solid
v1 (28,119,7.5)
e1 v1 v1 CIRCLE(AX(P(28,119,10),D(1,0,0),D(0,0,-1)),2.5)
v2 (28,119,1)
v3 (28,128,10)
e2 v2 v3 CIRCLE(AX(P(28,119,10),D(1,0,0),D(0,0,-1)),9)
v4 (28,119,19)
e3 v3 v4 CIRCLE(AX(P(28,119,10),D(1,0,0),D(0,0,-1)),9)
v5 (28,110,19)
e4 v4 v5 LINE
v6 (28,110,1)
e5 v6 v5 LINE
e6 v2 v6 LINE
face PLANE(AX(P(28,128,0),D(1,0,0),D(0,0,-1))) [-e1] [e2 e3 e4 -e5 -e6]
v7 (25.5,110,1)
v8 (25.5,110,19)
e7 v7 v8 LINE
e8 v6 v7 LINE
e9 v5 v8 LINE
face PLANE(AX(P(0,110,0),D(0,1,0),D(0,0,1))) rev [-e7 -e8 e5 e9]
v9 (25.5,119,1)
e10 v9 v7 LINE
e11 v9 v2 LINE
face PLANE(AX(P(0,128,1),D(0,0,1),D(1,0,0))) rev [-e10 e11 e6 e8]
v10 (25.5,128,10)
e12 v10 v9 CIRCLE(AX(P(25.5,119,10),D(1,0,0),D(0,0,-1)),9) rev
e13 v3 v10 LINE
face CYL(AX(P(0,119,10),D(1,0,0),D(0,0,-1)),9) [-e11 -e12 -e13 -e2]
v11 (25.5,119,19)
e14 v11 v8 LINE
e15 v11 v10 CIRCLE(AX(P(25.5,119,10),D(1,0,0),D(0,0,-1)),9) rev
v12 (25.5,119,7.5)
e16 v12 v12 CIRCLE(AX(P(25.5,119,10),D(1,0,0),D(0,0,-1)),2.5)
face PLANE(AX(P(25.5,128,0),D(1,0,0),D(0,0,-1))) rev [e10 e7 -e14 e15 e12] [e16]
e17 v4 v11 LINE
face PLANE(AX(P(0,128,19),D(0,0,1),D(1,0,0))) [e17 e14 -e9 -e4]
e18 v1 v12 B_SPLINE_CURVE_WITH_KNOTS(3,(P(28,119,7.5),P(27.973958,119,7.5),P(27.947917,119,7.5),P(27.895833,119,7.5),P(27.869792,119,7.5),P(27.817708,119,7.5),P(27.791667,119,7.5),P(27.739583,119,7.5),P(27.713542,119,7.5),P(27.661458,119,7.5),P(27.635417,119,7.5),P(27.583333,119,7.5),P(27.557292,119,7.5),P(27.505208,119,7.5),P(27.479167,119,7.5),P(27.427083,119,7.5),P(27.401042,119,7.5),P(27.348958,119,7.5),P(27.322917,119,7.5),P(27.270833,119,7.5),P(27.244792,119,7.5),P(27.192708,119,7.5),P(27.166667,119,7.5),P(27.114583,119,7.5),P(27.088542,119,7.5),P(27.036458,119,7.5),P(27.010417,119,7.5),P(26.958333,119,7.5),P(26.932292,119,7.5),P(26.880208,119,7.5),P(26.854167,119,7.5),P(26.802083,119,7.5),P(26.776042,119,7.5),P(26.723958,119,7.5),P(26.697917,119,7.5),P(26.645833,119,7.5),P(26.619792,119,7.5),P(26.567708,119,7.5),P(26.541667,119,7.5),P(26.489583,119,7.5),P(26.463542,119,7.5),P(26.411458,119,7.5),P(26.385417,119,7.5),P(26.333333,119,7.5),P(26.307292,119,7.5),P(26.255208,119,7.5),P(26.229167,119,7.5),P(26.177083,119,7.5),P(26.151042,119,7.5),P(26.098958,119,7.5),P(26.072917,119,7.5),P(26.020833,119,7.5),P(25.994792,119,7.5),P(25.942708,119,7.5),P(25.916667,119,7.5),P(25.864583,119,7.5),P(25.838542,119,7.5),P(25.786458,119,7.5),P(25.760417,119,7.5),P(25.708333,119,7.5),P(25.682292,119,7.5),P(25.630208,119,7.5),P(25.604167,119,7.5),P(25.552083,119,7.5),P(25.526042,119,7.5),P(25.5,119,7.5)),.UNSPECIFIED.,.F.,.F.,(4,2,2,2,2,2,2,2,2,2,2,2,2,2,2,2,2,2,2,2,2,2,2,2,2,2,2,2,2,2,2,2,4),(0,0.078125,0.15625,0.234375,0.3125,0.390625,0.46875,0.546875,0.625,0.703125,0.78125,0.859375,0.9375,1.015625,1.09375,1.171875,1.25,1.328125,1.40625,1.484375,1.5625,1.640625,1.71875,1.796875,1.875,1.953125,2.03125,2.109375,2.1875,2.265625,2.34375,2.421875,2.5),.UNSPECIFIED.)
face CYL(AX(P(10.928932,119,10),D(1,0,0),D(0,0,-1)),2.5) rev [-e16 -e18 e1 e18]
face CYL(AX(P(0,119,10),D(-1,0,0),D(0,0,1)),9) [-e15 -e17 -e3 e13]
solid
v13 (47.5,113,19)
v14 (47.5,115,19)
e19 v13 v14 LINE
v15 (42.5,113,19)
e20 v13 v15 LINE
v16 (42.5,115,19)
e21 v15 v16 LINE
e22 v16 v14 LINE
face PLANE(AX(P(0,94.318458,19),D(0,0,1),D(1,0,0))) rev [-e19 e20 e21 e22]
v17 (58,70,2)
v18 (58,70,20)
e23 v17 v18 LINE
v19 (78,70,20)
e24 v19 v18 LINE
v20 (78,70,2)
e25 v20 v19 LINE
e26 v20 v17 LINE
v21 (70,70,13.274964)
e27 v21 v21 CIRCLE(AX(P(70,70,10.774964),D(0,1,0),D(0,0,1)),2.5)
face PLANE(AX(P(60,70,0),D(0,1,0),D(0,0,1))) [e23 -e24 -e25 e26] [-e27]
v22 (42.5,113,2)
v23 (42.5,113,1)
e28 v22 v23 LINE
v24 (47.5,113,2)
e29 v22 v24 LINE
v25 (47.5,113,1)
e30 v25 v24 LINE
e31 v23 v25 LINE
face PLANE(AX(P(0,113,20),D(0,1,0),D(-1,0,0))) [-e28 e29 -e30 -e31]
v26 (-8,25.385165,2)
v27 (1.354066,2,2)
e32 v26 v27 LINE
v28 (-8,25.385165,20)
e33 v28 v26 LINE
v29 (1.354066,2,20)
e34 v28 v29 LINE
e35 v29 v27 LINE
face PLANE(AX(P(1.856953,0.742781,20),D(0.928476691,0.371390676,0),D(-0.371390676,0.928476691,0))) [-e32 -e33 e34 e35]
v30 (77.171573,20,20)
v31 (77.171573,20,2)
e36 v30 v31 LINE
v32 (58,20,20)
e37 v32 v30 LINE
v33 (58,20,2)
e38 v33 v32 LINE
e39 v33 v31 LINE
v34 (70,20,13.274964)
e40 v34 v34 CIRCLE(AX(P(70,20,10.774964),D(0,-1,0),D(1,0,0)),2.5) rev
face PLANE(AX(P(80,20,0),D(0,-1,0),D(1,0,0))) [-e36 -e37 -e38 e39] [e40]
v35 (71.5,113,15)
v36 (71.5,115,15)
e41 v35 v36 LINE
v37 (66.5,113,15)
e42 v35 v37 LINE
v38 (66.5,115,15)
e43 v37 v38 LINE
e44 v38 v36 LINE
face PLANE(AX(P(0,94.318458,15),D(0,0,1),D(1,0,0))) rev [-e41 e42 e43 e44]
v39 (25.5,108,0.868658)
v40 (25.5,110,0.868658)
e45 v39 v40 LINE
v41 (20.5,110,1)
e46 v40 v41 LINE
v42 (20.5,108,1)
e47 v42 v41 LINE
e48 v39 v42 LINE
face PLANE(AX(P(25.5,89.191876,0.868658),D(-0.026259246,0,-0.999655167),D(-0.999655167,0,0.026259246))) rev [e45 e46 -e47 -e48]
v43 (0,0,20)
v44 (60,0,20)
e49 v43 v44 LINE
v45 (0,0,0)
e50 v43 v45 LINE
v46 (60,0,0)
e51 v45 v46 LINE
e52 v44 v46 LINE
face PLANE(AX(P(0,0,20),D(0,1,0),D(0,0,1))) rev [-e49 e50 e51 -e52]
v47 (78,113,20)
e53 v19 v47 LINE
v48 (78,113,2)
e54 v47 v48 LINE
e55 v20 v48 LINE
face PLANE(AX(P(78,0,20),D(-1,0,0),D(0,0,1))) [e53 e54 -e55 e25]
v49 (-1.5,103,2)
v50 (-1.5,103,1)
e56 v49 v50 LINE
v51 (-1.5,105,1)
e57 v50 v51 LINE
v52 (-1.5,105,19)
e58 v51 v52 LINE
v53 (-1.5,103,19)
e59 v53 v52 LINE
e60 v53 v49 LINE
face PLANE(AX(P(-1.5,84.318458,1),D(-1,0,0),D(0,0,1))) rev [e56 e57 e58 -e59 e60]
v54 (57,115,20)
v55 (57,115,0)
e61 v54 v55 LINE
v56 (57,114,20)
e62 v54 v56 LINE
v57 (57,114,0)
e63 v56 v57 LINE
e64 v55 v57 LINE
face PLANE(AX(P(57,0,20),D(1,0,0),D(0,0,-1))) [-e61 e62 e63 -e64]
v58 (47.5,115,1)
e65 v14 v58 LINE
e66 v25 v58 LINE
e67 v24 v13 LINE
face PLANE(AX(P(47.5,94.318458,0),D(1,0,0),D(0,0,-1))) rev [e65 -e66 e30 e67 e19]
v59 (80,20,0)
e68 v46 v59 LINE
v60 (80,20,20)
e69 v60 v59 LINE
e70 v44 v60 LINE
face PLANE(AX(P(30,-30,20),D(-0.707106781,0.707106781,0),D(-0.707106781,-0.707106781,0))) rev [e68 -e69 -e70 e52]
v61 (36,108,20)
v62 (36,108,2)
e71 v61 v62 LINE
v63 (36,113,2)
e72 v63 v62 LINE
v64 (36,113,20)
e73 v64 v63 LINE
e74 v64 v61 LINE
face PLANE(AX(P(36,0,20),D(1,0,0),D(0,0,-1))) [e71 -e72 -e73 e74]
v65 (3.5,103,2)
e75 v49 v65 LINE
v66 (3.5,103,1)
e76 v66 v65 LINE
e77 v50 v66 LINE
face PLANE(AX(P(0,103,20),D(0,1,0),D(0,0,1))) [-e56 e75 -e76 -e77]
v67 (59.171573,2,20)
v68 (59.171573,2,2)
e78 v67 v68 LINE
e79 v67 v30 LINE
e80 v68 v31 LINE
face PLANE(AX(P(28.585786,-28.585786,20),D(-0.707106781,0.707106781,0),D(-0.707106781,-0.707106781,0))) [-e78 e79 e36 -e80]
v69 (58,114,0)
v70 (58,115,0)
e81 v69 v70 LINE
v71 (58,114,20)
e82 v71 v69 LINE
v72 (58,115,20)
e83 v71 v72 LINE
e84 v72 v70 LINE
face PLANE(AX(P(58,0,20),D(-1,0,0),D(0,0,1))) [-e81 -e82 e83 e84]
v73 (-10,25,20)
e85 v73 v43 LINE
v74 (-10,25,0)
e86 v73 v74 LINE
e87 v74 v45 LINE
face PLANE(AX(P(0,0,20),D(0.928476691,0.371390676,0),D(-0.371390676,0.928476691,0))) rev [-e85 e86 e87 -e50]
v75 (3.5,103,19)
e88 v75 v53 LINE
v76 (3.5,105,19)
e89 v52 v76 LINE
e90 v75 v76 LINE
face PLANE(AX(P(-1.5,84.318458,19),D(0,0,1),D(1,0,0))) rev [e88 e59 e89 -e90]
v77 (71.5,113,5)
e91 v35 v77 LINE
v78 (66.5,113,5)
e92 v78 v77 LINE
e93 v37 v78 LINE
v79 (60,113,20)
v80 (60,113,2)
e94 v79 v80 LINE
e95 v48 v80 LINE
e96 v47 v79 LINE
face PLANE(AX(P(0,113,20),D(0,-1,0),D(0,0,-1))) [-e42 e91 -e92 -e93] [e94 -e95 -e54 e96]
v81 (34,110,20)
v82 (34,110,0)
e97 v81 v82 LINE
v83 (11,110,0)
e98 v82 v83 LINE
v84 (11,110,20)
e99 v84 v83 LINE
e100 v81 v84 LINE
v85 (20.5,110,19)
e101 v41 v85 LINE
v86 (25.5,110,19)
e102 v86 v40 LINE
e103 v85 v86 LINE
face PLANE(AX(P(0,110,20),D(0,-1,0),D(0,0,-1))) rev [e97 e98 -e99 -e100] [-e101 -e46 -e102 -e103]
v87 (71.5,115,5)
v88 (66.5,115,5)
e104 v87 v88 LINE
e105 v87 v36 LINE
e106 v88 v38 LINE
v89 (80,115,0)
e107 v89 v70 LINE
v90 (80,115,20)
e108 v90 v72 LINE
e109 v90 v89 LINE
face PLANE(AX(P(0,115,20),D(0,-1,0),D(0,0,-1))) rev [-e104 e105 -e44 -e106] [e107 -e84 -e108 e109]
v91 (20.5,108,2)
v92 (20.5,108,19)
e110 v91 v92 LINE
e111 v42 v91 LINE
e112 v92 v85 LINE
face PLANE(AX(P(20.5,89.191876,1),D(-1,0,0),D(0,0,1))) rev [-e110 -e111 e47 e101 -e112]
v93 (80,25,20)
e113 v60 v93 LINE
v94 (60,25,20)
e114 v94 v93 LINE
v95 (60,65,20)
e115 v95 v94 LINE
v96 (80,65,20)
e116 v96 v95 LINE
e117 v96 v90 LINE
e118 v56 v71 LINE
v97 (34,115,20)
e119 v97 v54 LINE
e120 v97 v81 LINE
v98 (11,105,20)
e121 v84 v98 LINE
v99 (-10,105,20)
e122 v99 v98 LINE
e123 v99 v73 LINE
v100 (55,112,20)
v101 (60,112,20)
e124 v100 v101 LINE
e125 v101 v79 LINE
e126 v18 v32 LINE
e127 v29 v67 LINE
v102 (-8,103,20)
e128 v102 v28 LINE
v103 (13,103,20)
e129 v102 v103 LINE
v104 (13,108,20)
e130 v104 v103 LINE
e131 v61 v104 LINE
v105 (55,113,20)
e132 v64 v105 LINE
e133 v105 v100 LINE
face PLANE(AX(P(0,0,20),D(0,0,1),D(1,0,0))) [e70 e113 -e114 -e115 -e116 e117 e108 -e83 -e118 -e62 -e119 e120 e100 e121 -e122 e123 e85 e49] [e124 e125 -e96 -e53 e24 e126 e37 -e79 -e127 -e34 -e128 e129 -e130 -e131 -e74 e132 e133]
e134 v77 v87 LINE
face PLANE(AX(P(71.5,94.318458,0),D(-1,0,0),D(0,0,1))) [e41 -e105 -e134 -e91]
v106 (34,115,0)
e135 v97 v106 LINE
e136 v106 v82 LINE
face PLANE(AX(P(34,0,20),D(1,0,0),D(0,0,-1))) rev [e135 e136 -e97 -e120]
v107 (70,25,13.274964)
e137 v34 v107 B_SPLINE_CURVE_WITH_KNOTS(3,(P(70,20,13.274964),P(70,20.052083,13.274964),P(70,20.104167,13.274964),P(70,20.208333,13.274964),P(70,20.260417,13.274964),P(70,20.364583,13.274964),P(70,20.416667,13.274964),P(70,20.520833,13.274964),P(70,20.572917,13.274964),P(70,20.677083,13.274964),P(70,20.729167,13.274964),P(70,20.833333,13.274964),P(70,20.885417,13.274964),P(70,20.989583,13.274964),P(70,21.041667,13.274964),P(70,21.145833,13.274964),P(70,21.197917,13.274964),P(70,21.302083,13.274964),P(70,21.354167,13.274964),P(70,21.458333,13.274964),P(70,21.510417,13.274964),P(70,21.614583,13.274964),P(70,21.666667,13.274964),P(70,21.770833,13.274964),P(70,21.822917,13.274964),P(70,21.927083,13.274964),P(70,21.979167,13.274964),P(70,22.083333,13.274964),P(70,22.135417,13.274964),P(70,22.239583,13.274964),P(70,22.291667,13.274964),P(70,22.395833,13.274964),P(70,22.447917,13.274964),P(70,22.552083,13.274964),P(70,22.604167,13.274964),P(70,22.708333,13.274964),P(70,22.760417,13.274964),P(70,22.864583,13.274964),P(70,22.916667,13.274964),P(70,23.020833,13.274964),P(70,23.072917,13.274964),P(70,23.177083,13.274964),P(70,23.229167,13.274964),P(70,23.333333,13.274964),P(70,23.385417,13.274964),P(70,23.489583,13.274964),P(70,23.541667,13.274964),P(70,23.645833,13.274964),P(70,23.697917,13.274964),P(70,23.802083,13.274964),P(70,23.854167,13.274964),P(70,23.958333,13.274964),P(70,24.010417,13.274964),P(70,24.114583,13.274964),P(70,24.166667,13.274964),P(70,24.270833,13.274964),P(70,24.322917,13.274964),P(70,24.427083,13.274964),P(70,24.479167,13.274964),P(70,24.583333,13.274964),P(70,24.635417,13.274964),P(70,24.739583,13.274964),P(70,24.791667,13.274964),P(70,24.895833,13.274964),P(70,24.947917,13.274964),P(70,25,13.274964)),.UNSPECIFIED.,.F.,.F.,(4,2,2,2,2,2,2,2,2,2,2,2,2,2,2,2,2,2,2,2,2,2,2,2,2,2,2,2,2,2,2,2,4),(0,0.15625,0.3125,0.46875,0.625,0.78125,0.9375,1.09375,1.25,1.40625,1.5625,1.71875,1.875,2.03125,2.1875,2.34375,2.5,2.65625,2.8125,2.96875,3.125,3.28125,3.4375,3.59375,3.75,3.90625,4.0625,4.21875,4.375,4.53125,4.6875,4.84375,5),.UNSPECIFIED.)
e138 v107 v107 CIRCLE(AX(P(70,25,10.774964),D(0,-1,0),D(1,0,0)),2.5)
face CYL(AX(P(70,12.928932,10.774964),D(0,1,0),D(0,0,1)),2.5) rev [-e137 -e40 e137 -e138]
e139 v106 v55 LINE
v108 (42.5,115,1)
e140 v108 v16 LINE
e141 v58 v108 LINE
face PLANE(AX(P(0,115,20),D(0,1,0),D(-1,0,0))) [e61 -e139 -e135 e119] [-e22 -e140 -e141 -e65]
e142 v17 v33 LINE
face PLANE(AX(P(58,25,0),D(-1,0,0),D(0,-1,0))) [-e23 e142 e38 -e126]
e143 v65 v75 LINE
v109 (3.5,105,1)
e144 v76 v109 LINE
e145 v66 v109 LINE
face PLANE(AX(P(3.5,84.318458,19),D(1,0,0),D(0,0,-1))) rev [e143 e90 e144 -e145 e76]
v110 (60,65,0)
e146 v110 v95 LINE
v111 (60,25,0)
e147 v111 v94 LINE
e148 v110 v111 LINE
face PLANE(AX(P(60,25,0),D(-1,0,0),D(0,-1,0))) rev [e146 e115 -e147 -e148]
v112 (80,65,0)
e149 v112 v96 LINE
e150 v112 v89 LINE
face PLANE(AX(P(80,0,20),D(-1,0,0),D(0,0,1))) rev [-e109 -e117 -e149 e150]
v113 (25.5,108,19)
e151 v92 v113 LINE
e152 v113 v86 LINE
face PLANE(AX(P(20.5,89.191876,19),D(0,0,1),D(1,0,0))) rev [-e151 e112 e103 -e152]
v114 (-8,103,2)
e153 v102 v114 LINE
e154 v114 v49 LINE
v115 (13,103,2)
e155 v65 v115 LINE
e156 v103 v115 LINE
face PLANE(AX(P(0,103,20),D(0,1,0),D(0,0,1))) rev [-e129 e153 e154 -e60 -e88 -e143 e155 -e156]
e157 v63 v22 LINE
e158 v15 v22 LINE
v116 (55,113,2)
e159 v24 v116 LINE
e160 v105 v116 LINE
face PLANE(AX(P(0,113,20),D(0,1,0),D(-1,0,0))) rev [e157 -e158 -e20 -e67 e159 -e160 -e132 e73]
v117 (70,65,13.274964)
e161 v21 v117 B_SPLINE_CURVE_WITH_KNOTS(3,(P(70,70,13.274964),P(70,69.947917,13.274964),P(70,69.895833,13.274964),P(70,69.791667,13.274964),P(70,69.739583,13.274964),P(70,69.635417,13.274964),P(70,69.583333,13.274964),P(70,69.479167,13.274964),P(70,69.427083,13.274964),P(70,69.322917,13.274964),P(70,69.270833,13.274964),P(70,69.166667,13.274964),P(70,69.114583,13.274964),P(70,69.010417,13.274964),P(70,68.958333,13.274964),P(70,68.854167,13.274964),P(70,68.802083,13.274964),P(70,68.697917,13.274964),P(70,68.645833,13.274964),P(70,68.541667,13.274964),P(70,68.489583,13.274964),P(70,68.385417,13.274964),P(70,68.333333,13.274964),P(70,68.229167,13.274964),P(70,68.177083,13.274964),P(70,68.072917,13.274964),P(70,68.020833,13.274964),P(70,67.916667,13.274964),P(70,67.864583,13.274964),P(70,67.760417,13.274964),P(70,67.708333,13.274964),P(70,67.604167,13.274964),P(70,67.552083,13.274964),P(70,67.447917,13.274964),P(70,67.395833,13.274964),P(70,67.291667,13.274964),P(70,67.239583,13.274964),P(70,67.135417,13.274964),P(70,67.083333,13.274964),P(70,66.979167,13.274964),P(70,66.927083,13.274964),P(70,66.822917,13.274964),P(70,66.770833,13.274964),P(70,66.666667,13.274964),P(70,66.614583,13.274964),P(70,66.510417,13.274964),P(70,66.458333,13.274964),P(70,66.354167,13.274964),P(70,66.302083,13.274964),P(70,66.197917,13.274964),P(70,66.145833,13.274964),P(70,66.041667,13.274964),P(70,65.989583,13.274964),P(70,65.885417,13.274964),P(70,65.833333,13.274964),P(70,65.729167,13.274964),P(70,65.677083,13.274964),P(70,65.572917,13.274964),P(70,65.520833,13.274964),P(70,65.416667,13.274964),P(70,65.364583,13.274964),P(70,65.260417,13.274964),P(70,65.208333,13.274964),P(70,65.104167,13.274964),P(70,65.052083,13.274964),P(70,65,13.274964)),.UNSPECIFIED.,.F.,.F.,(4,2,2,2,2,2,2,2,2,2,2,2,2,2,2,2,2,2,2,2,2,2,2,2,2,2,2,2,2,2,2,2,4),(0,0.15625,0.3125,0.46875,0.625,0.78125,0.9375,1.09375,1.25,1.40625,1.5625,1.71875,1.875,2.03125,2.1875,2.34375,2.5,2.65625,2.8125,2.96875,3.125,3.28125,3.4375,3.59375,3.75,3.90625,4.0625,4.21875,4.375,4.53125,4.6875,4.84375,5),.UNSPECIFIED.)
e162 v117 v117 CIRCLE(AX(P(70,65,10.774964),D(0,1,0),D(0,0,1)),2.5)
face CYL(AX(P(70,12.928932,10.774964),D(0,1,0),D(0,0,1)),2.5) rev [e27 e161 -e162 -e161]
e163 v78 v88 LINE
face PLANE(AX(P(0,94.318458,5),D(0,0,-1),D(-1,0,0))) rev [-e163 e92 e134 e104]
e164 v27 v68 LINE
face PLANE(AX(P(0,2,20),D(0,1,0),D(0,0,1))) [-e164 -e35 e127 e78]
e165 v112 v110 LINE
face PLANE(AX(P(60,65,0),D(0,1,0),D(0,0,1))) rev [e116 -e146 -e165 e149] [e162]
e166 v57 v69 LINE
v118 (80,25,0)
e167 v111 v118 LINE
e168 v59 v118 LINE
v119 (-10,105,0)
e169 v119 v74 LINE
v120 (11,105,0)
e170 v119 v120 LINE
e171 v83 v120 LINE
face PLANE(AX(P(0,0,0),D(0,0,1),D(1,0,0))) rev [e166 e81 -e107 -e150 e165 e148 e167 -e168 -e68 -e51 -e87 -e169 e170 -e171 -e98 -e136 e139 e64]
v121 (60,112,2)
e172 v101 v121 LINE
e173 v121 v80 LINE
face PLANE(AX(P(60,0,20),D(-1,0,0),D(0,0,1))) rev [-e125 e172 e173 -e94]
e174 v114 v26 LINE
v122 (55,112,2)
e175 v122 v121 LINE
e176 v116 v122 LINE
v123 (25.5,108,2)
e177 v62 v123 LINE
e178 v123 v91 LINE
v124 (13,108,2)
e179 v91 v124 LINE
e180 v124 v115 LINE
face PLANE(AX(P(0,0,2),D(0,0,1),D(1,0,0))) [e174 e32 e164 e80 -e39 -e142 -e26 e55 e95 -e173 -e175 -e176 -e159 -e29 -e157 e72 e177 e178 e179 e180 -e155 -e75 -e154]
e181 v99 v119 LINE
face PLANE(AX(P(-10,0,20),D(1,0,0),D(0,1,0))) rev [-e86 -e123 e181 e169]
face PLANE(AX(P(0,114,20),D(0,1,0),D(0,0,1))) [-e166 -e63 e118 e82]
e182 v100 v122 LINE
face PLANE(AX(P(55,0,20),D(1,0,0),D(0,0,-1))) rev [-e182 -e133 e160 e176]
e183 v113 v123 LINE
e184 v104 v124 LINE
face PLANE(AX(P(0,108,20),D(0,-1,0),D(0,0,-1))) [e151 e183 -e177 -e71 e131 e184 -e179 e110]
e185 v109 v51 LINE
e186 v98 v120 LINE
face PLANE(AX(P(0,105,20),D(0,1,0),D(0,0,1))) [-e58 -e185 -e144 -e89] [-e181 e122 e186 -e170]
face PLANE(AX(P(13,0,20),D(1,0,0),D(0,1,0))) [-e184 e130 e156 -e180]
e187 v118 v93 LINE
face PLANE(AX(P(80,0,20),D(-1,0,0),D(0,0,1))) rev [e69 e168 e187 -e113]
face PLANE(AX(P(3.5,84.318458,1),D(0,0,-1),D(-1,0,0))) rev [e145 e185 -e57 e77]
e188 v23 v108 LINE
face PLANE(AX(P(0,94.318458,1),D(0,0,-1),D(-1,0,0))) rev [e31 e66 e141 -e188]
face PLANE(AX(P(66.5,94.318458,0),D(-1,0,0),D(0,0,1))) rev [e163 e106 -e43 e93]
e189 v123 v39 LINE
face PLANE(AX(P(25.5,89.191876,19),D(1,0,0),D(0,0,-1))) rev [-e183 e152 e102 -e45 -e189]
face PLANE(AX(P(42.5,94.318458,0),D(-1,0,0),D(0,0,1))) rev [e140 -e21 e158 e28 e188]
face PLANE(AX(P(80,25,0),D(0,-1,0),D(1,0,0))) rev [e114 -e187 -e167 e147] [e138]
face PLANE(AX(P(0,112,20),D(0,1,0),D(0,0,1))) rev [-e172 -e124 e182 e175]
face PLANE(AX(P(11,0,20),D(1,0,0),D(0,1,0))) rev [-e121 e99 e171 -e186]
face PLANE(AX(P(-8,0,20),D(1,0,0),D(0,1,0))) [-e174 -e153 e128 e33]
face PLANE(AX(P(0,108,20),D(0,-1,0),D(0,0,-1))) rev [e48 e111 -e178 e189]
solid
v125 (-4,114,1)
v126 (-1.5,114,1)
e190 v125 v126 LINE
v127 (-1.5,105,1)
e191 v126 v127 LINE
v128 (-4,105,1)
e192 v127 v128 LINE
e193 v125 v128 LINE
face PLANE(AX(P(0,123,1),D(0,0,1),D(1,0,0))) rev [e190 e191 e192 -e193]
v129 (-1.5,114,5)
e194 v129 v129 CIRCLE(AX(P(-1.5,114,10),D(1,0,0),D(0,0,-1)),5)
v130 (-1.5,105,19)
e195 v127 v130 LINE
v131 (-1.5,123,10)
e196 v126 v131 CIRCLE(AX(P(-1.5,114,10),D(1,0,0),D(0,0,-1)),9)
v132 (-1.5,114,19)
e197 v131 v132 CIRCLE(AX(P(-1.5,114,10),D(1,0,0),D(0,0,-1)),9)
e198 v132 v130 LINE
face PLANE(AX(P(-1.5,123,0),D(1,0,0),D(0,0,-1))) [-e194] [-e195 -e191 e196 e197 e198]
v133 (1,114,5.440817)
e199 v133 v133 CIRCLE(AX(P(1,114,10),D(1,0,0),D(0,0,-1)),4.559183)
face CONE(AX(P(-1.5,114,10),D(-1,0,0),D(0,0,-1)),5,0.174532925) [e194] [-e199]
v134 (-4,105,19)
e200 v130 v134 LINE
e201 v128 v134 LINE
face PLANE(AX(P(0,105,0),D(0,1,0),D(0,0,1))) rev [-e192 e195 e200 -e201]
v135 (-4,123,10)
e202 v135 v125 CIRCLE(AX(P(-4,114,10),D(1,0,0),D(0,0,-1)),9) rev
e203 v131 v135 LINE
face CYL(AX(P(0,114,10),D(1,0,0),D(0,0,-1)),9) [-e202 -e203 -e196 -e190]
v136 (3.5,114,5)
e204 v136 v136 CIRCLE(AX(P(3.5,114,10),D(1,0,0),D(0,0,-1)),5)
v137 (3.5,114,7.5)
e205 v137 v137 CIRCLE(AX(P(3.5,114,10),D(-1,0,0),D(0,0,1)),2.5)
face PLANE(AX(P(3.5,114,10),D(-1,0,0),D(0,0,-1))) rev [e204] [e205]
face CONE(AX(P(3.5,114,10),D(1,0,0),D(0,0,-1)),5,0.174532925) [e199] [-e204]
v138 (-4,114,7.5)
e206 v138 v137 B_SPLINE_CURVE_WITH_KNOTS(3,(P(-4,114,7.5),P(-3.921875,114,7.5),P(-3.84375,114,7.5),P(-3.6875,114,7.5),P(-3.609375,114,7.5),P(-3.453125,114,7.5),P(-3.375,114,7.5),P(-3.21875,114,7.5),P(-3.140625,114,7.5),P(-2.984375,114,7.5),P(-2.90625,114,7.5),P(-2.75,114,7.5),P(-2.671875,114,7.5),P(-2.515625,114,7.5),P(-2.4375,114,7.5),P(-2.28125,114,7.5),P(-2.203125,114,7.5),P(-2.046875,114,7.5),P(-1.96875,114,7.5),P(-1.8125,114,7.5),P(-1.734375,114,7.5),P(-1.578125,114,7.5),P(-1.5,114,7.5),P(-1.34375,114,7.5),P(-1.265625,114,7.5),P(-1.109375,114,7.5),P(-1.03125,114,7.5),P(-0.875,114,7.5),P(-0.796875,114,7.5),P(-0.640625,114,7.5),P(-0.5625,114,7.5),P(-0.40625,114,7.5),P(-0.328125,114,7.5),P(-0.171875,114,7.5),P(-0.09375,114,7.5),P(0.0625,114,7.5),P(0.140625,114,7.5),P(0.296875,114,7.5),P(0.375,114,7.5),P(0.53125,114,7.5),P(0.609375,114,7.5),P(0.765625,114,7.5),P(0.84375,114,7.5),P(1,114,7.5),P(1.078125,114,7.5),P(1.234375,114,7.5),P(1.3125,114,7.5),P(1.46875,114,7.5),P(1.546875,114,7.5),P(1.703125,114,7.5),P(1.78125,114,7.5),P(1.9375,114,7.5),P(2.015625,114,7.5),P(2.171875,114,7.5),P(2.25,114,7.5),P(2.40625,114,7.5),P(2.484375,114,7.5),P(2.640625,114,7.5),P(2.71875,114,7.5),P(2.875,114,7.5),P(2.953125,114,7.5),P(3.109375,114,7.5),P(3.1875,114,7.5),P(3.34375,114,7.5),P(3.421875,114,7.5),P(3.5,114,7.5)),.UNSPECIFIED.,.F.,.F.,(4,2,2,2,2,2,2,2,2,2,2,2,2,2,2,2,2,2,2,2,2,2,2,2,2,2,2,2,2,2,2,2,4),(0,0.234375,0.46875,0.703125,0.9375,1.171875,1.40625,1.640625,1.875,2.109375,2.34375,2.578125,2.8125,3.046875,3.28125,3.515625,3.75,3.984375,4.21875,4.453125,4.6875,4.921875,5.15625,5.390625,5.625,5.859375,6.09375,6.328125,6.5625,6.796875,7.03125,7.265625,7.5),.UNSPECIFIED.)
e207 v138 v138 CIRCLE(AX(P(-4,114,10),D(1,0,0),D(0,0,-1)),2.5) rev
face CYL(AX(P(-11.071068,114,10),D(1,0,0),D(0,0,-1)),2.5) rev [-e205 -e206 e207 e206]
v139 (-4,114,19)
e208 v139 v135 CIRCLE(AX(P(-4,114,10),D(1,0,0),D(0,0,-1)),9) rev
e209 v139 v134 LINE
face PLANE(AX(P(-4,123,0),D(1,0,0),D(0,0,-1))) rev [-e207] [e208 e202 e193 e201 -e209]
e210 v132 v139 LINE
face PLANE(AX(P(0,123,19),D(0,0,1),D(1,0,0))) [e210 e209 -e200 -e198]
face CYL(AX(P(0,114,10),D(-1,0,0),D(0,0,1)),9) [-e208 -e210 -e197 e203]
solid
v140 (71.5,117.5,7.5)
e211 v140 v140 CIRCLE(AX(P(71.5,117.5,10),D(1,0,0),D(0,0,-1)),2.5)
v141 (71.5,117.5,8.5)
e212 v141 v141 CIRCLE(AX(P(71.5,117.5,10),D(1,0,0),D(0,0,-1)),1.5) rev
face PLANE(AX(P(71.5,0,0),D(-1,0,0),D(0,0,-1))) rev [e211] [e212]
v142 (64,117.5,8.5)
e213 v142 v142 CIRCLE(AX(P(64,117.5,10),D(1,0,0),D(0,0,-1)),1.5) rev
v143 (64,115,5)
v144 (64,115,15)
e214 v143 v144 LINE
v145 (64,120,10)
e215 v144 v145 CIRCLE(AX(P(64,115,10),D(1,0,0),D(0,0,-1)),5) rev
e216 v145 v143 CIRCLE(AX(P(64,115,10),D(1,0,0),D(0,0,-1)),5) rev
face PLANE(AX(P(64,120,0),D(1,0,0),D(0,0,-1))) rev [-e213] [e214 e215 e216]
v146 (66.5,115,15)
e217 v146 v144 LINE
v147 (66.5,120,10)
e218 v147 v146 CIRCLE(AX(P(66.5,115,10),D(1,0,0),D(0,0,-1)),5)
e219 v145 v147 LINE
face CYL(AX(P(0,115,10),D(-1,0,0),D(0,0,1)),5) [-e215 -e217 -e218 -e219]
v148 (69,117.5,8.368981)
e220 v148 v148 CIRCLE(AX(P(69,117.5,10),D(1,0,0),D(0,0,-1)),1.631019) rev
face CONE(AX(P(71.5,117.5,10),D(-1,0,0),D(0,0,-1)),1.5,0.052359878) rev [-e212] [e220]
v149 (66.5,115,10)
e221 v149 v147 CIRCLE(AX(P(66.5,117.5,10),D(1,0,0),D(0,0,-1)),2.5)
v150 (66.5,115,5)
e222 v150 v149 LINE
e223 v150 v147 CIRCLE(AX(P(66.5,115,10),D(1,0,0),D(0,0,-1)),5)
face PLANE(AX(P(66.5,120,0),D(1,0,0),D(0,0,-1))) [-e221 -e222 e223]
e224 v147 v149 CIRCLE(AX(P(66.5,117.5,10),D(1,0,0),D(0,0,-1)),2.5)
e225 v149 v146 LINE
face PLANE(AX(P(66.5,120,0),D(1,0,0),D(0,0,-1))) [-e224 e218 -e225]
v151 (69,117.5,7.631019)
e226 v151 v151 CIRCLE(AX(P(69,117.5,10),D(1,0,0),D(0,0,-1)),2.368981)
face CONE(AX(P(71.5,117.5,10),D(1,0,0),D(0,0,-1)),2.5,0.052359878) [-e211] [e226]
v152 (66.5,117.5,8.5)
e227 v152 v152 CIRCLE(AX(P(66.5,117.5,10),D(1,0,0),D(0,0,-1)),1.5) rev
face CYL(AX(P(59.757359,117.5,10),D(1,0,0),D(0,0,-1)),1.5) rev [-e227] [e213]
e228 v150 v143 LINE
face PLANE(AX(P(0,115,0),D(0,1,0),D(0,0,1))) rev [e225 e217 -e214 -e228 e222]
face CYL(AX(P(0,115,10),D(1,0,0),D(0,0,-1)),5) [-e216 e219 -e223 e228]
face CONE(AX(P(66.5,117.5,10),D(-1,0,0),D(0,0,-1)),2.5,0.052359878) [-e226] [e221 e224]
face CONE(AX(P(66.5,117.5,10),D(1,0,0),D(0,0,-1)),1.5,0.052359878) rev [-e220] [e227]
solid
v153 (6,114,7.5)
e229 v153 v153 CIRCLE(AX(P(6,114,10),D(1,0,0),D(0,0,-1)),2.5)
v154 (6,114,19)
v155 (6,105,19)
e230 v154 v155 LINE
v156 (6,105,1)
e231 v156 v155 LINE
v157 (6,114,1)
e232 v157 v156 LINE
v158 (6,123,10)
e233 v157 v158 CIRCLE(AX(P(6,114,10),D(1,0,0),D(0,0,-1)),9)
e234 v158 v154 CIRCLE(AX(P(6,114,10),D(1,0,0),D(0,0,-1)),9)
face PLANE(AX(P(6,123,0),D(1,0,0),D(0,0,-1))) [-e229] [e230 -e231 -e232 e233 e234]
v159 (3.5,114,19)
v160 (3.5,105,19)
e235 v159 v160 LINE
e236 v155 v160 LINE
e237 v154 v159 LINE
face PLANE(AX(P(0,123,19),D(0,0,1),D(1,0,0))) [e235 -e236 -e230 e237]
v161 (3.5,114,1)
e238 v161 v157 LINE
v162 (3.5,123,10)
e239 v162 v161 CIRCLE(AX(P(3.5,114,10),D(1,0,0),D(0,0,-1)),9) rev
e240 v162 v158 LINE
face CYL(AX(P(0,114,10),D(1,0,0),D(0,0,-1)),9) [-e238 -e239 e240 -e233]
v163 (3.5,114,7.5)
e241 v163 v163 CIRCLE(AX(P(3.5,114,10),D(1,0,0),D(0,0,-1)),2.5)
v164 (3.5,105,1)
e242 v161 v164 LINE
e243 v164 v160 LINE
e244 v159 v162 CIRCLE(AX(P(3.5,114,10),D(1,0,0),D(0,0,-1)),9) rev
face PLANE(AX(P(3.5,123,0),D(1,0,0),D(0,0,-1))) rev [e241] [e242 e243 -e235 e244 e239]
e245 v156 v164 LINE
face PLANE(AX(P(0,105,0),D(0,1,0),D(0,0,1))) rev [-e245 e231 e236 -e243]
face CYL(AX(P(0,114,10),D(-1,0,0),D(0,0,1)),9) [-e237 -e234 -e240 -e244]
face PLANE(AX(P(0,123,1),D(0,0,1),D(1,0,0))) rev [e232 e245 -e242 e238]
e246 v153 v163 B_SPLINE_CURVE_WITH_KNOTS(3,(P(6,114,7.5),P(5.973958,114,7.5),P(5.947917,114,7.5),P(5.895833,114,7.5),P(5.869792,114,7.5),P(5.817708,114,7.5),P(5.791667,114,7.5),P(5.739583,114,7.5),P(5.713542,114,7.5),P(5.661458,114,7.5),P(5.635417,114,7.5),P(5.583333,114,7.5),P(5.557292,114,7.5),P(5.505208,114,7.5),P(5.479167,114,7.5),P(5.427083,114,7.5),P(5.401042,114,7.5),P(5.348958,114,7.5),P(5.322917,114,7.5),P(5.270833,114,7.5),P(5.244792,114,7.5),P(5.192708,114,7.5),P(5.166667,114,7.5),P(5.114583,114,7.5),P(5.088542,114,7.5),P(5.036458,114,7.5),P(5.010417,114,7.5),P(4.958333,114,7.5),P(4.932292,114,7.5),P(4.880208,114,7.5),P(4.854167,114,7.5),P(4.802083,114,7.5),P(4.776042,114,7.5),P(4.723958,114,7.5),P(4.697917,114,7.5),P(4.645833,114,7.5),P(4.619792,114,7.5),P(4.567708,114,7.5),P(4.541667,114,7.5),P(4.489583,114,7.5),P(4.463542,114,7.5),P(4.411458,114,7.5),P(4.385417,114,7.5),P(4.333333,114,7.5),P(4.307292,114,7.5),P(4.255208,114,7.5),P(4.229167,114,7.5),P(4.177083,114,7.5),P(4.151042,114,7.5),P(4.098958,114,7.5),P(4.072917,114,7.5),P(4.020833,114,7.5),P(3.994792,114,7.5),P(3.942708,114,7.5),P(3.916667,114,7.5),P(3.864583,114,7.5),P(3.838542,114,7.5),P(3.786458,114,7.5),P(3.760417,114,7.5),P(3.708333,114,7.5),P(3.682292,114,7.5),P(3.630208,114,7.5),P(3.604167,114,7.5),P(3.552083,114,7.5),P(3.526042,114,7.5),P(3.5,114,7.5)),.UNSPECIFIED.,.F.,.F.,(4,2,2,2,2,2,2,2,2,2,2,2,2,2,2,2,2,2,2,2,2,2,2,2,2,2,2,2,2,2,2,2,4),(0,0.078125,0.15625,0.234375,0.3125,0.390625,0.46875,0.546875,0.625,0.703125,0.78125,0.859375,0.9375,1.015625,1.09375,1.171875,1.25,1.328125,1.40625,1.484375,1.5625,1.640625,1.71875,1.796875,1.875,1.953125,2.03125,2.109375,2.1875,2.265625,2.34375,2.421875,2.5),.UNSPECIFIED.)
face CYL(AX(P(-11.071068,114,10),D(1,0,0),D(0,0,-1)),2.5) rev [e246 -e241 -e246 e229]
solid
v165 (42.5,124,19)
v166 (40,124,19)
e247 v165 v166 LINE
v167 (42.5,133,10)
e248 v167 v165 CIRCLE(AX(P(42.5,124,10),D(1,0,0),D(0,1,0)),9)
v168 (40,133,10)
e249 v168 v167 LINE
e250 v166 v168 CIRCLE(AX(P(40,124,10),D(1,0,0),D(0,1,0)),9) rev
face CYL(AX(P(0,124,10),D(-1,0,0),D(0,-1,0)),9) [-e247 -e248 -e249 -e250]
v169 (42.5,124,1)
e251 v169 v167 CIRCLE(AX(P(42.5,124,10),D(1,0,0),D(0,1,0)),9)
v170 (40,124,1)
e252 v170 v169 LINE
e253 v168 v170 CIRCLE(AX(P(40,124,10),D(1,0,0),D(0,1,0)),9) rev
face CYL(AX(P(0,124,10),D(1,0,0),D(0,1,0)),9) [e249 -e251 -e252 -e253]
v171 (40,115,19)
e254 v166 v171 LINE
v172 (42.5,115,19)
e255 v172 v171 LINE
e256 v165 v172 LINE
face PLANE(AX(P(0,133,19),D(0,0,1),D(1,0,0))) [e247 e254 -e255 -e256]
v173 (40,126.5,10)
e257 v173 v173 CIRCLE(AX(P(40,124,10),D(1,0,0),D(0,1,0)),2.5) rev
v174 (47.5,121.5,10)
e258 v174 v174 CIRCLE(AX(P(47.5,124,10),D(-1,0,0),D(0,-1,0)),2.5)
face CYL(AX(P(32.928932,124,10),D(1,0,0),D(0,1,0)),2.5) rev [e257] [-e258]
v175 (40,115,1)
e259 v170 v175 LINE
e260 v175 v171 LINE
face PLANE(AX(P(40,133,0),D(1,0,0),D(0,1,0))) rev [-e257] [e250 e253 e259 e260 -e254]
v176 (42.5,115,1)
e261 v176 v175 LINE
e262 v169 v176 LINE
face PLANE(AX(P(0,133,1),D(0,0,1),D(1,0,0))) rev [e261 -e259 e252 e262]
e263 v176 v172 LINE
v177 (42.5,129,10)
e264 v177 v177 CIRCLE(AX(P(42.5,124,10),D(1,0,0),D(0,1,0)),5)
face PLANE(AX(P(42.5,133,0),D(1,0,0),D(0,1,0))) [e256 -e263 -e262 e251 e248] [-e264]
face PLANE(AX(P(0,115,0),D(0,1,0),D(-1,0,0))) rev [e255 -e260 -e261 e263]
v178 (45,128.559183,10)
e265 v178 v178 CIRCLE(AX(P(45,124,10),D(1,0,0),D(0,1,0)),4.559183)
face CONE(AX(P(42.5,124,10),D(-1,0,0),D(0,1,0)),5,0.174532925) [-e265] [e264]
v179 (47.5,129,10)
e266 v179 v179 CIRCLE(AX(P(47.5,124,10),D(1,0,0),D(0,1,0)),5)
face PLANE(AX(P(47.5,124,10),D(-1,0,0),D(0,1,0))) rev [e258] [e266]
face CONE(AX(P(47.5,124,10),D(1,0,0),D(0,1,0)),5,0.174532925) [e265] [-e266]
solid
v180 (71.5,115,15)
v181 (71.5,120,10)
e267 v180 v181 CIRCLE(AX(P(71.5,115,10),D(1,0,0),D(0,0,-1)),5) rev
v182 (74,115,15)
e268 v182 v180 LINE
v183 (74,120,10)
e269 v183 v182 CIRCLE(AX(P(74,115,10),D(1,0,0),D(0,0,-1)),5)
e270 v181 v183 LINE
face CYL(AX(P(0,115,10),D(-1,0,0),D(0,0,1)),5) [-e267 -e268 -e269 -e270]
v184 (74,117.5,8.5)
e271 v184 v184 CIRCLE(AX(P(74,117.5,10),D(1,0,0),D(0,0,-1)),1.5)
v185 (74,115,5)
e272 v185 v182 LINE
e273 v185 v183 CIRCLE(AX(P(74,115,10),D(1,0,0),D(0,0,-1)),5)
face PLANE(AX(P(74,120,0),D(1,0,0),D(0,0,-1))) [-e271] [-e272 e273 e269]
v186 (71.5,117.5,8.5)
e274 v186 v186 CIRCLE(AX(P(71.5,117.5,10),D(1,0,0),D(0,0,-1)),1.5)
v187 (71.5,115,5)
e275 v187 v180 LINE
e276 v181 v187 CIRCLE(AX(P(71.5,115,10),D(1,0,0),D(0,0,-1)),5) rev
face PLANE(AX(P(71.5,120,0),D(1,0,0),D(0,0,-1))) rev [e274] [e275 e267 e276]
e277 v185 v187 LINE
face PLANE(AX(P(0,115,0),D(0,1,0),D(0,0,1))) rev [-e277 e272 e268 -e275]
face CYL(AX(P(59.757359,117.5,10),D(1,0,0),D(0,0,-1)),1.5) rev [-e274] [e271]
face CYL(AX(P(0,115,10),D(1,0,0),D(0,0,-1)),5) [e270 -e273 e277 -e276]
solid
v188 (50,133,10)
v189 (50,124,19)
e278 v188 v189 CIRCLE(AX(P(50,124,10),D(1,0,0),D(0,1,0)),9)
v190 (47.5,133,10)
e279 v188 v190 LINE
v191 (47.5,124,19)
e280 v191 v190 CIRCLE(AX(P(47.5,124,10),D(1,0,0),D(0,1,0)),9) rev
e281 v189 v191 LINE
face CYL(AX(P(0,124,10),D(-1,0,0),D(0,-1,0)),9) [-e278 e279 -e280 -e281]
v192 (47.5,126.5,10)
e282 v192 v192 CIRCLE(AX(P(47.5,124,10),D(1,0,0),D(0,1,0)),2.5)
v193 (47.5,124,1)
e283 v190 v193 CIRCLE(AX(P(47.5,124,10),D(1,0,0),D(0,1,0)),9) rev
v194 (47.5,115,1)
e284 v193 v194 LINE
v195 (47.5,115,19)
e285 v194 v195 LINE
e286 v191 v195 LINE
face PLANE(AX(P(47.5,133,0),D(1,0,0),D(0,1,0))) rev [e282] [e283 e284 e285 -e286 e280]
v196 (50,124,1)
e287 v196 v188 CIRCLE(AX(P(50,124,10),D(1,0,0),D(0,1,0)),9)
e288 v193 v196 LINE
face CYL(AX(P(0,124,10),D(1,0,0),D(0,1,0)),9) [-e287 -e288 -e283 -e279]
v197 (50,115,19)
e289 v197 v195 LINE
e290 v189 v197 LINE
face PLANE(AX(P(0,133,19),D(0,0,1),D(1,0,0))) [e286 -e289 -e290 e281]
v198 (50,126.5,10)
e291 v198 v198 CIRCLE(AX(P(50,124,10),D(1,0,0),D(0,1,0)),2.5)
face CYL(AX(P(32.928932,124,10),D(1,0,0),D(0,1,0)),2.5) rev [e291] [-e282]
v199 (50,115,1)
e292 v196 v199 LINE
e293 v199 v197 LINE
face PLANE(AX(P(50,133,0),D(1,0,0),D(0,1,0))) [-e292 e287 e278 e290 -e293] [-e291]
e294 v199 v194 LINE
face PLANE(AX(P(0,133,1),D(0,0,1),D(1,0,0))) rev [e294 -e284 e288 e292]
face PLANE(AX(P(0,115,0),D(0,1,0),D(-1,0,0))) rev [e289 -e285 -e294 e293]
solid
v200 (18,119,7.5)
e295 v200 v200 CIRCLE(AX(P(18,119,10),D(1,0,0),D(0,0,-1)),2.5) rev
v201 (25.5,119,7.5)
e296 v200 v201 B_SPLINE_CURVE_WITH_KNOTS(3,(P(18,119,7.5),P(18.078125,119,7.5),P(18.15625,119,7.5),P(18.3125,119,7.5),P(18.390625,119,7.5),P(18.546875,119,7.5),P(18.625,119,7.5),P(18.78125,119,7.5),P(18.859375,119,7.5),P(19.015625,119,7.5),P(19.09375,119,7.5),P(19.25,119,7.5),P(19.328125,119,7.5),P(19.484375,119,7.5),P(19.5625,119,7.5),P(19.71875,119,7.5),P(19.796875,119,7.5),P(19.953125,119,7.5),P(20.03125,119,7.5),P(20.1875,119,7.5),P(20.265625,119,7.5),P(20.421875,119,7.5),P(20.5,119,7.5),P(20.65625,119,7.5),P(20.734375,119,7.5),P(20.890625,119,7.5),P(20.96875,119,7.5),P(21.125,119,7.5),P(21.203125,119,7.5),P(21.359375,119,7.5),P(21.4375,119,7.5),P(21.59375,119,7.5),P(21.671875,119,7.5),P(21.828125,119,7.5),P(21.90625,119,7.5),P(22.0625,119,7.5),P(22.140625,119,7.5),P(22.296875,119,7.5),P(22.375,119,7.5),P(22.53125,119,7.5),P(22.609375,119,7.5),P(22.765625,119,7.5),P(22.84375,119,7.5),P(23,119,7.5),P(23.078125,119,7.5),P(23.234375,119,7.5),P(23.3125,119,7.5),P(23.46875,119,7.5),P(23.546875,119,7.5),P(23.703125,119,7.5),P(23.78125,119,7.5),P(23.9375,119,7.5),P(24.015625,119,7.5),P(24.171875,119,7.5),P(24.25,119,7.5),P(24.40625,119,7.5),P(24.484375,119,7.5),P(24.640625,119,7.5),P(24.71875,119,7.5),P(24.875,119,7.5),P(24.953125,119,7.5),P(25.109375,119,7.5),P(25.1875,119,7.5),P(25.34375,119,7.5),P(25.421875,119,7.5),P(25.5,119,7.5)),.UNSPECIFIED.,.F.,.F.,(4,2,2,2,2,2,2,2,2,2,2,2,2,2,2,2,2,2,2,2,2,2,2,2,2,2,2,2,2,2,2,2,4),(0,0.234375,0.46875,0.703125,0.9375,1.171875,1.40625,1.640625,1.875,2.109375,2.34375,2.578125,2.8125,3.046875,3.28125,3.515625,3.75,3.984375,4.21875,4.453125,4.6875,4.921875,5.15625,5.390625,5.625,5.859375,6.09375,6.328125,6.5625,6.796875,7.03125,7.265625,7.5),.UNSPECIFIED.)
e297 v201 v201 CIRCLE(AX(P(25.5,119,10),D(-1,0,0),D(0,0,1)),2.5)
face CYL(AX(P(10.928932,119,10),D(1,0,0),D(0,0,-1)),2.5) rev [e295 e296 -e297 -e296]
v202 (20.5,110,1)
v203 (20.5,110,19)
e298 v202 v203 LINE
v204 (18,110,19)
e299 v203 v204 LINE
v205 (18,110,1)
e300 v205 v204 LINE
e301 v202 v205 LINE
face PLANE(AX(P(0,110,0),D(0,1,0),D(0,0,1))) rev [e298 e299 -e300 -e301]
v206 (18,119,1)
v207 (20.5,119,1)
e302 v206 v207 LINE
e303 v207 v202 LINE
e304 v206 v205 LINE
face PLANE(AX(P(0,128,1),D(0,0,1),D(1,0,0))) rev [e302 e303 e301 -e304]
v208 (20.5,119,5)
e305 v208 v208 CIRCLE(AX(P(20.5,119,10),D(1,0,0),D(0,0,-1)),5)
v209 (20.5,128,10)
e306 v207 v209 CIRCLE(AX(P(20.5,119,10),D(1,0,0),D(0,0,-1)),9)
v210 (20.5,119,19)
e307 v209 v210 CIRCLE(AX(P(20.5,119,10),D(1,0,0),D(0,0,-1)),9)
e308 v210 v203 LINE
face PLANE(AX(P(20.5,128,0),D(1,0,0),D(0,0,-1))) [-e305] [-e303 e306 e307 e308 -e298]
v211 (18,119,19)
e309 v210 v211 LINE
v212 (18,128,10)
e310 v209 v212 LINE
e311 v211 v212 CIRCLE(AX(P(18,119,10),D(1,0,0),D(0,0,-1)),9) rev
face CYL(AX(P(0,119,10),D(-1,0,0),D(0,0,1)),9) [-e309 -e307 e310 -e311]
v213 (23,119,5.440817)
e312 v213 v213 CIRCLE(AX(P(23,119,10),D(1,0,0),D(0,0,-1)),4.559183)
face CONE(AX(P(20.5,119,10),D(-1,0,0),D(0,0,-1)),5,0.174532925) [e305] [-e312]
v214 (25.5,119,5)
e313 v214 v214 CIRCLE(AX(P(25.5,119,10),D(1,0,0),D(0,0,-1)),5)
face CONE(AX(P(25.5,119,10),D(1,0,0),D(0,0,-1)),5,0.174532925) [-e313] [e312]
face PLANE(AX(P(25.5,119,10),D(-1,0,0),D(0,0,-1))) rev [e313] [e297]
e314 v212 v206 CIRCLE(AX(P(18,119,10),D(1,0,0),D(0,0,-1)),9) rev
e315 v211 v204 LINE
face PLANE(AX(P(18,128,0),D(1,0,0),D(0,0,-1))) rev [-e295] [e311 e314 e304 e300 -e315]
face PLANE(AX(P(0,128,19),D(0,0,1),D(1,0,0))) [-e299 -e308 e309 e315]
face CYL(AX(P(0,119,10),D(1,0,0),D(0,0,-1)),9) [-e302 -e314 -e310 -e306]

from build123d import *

# Parameters (mm, degrees)
BOSS_EXTRUDE1_DEPTH       = 20
SKETCH2_W                 = 20
SKETCH2_H                 = 40
CUT_EXTRUDE1_DEPTH        = 142.509716981
SHELL1_T                  = -2
SHELL1_THICKNESS_2_FACE_W = 20
SHELL1_THICKNESS_2_FACE_H = 18
SHELL1_THICKNESS_2_DEPTH  = 3
SHELL1_THICKNESS_3_FACE_W = 18
SHELL1_THICKNESS_3_FACE_H = 20
SHELL1_THICKNESS_3_DEPTH  = 3
SKETCH3_W                 = 2.5
SKETCH3_H                 = 10
BOSS_EXTRUDE2_DEPTH       = 5
BOSS_EXTRUDE2_2_DEPTH     = 5
FILLET2_R                 = 5
FILLET3_R                 = 5
CUT_EXTRUDE3_START        = -10
SKETCH6_R                 = 1.5
CUT_EXTRUDE3_DEPTH        = 10
SKETCH7_W                 = 2.5
SKETCH7_H                 = 18
BOSS_EXTRUDE4_DEPTH       = 18
BOSS_EXTRUDE4_2_DEPTH     = 18
FILLET4_R                 = 9
FILLET5_R                 = 9
SKETCH8_R                 = 5
BOSS_EXTRUDE5_DEPTH       = 2.5
BOSS_EXTRUDE5_TAPER       = 10
CUT_EXTRUDE4_START        = -10
SKETCH9_R                 = 2.5
CUT_EXTRUDE4_DEPTH        = 10
SKETCH10_W                = 2.5
SKETCH10_H                = 18
BOSS_EXTRUDE6_DEPTH       = 18
BOSS_EXTRUDE6_2_DEPTH     = 18
FILLET6_R                 = 9
FILLET7_R                 = 9
SKETCH11_R                = 5
BOSS_EXTRUDE7_DEPTH       = 2.5
BOSS_EXTRUDE7_TAPER       = 10
CUT_EXTRUDE5_START        = -10
SKETCH12_R                = 2.5
CUT_EXTRUDE5_DEPTH        = 32
SKETCH13_W                = 2.5
SKETCH13_H                = 18
BOSS_EXTRUDE8_DEPTH       = 18
BOSS_EXTRUDE8_2_DEPTH     = 18
FILLET8_R                 = 9
FILLET9_R                 = 9
SKETCH14_R                = 5
BOSS_EXTRUDE9_DEPTH       = 2.5
BOSS_EXTRUDE9_TAPER       = 10
CUT_EXTRUDE6_START        = -10
SKETCH15_R                = 2.5
CUT_EXTRUDE6_DEPTH        = 54
SKETCH16_W                = 5
SKETCH16_H                = 10
SKETCH16_H_2              = 18
CUT_EXTRUDE7_DEPTH        = 2
CUT_EXTRUDE8_DEPTH        = 2
SKETCH18_W                = 5
SKETCH18_H                = 18
CUT_EXTRUDE9_DEPTH        = 2
CUT_EXTRUDE10_REACH       = 110.167
SKETCH19_R                = 2.5
SKETCH21_R                = 2.5
SKETCH21_R_2              = 1.5
BOSS_EXTRUDE10_DEPTH      = 2.5
BOSS_EXTRUDE10_DRAFT      = 3
MIRROR7_COPY_1_SKETCH_R   = 2.5
MIRROR7_COPY_1_SKETCH_R_2 = 1.5
MIRROR7_COPY_1_DEPTH      = 2.5
MIRROR7_COPY_1_DRAFT      = 3


with BuildPart() as part:
    # Sketch1 → Boss-Extrude1 (new body)
    with BuildSketch(Plane.XY):
        Polygon((58, 114), (58, 115), (80, 115), (80, 20), (60, 0), (0, 0), (-10, 25), (-10, 105), (11, 105), (11, 110), (12, 110), (34, 110), (34, 115), (35, 115), (57, 115), (57, 114), align=None)
    extrude(amount=BOSS_EXTRUDE1_DEPTH)

    # Sketch2 → Cut-Extrude1 (cut, through all)
    with BuildSketch(Plane.XY.offset(20)):
        with Locations((70, 45)):
            Rectangle(SKETCH2_W, SKETCH2_H)
    extrude(amount=-CUT_EXTRUDE1_DEPTH, mode=Mode.SUBTRACT)

    # Shell1
    shell1_openings = [part.faces().sort_by_distance(p)[0] for p in [
        (32.550473836, 58.500730419, 20),
    ]]
    offset(amount=SHELL1_T, openings=shell1_openings, kind=Kind.INTERSECTION)

    # Shell1 thickness 2 face (on inner face of the shell) → Shell1 thickness 2 (add)
    with BuildSketch(Plane(origin=(68, 23, 11), x_dir=(1, 0, 0), z_dir=(0, 1, 0))):
        Rectangle(SHELL1_THICKNESS_2_FACE_W, SHELL1_THICKNESS_2_FACE_H)
    extrude(amount=-SHELL1_THICKNESS_2_DEPTH)

    # Shell1 thickness 3 face (on inner face of the shell) → Shell1 thickness 3 (add)
    with BuildSketch(Plane(origin=(68, 67, 11), x_dir=(0, 0, -1), z_dir=(0, -1, 0))):
        Rectangle(SHELL1_THICKNESS_3_FACE_W, SHELL1_THICKNESS_3_FACE_H)
    extrude(amount=-SHELL1_THICKNESS_3_DEPTH)

    # Sketch16 → Cut-Extrude7 (cut)
    with BuildSketch(Plane(origin=(0, 115, 0), x_dir=(1, 0, 0), z_dir=(0, 1, 0))):
        with Locations((69, -10)):
            Rectangle(SKETCH16_W, SKETCH16_H)
        with Locations((45, -10)):
            Rectangle(SKETCH16_W, SKETCH16_H_2)
    extrude(amount=-CUT_EXTRUDE7_DEPTH, mode=Mode.SUBTRACT)

    # Sketch17 → Cut-Extrude8 (cut)
    with BuildSketch(Plane(origin=(0, 110, 0), x_dir=(1, 0, 0), z_dir=(0, 1, 0))):
        Polygon((20.5, -19), (25.5, -19), (25.5, -0.86865848), (20.5, -1), align=None)
    extrude(amount=-CUT_EXTRUDE8_DEPTH, mode=Mode.SUBTRACT)

    # Sketch18 → Cut-Extrude9 (cut)
    with BuildSketch(Plane(origin=(0, 105, 0), x_dir=(1, 0, 0), z_dir=(0, 1, 0))):
        with Locations((1, -10)):
            Rectangle(SKETCH18_W, SKETCH18_H)
    extrude(amount=-CUT_EXTRUDE9_DEPTH, mode=Mode.SUBTRACT)

    # Cut-Extrude10: up to this face of the body (flat: up to its plane)
    cut_extrude10_end = Plane(part.part.faces().sort_by_distance((67.585786438, 20, 11))[0])
    # Sketch19 → Cut-Extrude10 (cut, up to the picked face)
    with BuildSketch(Plane(origin=(0, 70, 0), x_dir=(1, 0, 0), z_dir=(0, 1, 0)), mode=Mode.PRIVATE) as cut_extrude10_sk1:
        with Locations(Location((70, -10.774964387, 0), (0, 0, 270))):
            Circle(SKETCH19_R)
    cut_extrude10_tool1 = split(extrude(cut_extrude10_sk1.sketch, amount=-CUT_EXTRUDE10_REACH, mode=Mode.PRIVATE), bisect_by=cut_extrude10_end, keep=Keep.BOTH, mode=Mode.PRIVATE)
    add(cut_extrude10_tool1.solids().sort_by(Axis((70, 70, 10.774964), (0, -1, 0)))[0], mode=Mode.SUBTRACT)


with BuildPart() as body_2:
    # Sketch3 → Boss-Extrude2 (new body)
    with BuildSketch(Plane(origin=(0, 115, 0), x_dir=(1, 0, 0), z_dir=(0, 1, 0))):
        with Locations((65.25, -10)):
            Rectangle(SKETCH3_W, SKETCH3_H)
    extrude(amount=BOSS_EXTRUDE2_DEPTH)

    # Fillet2
    fillet2_edges = [body_2.edges().sort_by_distance(p)[0] for p in [
        (65.25, 120, 5),
        (65.25, 120, 15),
    ]]
    fillet(fillet2_edges, radius=FILLET2_R - 0.0001)  # a hair under: the kernel refuses the full size


with BuildPart() as body_3:
    # Sketch3 → Boss-Extrude2 2 (new body)
    with BuildSketch(Plane(origin=(0, 115, 0), x_dir=(1, 0, 0), z_dir=(0, 1, 0))):
        with Locations((72.75, -10)):
            Rectangle(SKETCH3_W, SKETCH3_H)
    extrude(amount=BOSS_EXTRUDE2_2_DEPTH)

    # Fillet3
    fillet3_edges = [body_3.edges().sort_by_distance(p)[0] for p in [
        (72.75, 120, 5),
        (72.75, 120, 15),
    ]]
    fillet(fillet3_edges, radius=FILLET3_R - 0.0001)  # a hair under: the kernel refuses the full size


with BuildPart() as cut_extrude3_tool:
    # Sketch6 → Cut-Extrude3 (new body)
    with BuildSketch(Plane(origin=(74, 0, 0), x_dir=(0, 0, -1), z_dir=(1, 0, 0)).offset(CUT_EXTRUDE3_START)):
        with Locations((-10, 117.5)):
            Circle(SKETCH6_R)
    extrude(amount=CUT_EXTRUDE3_DEPTH)


with BuildPart() as body_2_1:
    add(body_2.part)

    # Cut-Extrude3: cut by cut_extrude3_tool
    add(cut_extrude3_tool.part, mode=Mode.SUBTRACT)


with BuildPart() as body_3_1:
    add(body_3.part)

    # Cut-Extrude3: cut by cut_extrude3_tool
    add(cut_extrude3_tool.part, mode=Mode.SUBTRACT)


with BuildPart() as body_4:
    # Sketch7 → Boss-Extrude4 (new body)
    with BuildSketch(Plane(origin=(0, 115, 0), x_dir=(1, 0, 0), z_dir=(0, 1, 0))):
        with Locations((41.25, -10)):
            Rectangle(SKETCH7_W, SKETCH7_H)
    extrude(amount=BOSS_EXTRUDE4_DEPTH)

    # Fillet4
    fillet4_edges = [body_4.edges().sort_by_distance(p)[0] for p in [
        (41.25, 133, 1),
        (41.25, 133, 19),
    ]]
    fillet(fillet4_edges, radius=FILLET4_R - 0.0001)  # a hair under: the kernel refuses the full size

    # Sketch8 → Boss-Extrude5 (add)
    with BuildSketch(Plane(origin=(42.5, 0, 0), x_dir=(0, 0, -1), z_dir=(1, 0, 0))):
        with Locations((-10, 124)):
            Circle(SKETCH8_R)
    boss_extrude5 = extrude(amount=BOSS_EXTRUDE5_DEPTH, taper=BOSS_EXTRUDE5_TAPER)

    # Mirror2: Boss-Extrude5 across plane
    add(boss_extrude5.mirror(Plane(origin=(45, 124, 10), x_dir=(0, 0, 1), z_dir=(1, 0, 0))))


with BuildPart() as body_5:
    # Sketch7 → Boss-Extrude4 2 (new body)
    with BuildSketch(Plane(origin=(0, 115, 0), x_dir=(1, 0, 0), z_dir=(0, 1, 0))):
        with Locations((48.75, -10)):
            Rectangle(SKETCH7_W, SKETCH7_H)
    extrude(amount=BOSS_EXTRUDE4_2_DEPTH)

    # Fillet5
    fillet5_edges = [body_5.edges().sort_by_distance(p)[0] for p in [
        (48.75, 133, 19),
        (48.75, 133, 1),
    ]]
    fillet(fillet5_edges, radius=FILLET5_R - 0.0001)  # a hair under: the kernel refuses the full size


with BuildPart() as cut_extrude4_tool:
    # Sketch9 → Cut-Extrude4 (new body)
    with BuildSketch(Plane(origin=(50, 0, 0), x_dir=(0, 0, -1), z_dir=(1, 0, 0)).offset(CUT_EXTRUDE4_START)):
        with Locations(Location((-10, 124, 0), (0, 0, 90))):
            Circle(SKETCH9_R)
    extrude(amount=CUT_EXTRUDE4_DEPTH)


with BuildPart() as body_4_1:
    add(body_4.part)

    # Cut-Extrude4: cut by cut_extrude4_tool
    add(cut_extrude4_tool.part, mode=Mode.SUBTRACT)


with BuildPart() as body_5_1:
    add(body_5.part)

    # Cut-Extrude4: cut by cut_extrude4_tool
    add(cut_extrude4_tool.part, mode=Mode.SUBTRACT)


with BuildPart() as body_6:
    # Sketch10 → Boss-Extrude6 (new body)
    with BuildSketch(Plane(origin=(0, 110, 0), x_dir=(1, 0, 0), z_dir=(0, 1, 0))):
        with Locations((19.25, -10)):
            Rectangle(SKETCH10_W, SKETCH10_H)
    extrude(amount=BOSS_EXTRUDE6_DEPTH)

    # Fillet6
    fillet6_edges = [body_6.edges().sort_by_distance(p)[0] for p in [
        (19.25, 128, 19),
        (19.25, 128, 1),
    ]]
    fillet(fillet6_edges, radius=FILLET6_R - 0.0001)  # a hair under: the kernel refuses the full size

    # Sketch11 → Boss-Extrude7 (add)
    with BuildSketch(Plane(origin=(20.5, 0, 0), x_dir=(0, 0, -1), z_dir=(1, 0, 0))):
        with Locations((-10, 119)):
            Circle(SKETCH11_R)
    boss_extrude7 = extrude(amount=BOSS_EXTRUDE7_DEPTH, taper=BOSS_EXTRUDE7_TAPER)

    # Mirror3: Boss-Extrude7 across plane
    add(boss_extrude7.mirror(Plane(origin=(23, 119, 10), x_dir=(0, 0, 1), z_dir=(1, 0, 0))))


with BuildPart() as body_7:
    # Sketch10 → Boss-Extrude6 2 (new body)
    with BuildSketch(Plane(origin=(0, 110, 0), x_dir=(1, 0, 0), z_dir=(0, 1, 0))):
        with Locations((26.75, -10)):
            Rectangle(SKETCH10_W, SKETCH10_H)
    extrude(amount=BOSS_EXTRUDE6_2_DEPTH)

    # Fillet7
    fillet7_edges = [body_7.edges().sort_by_distance(p)[0] for p in [
        (26.75, 128, 19),
        (26.75, 128, 1),
    ]]
    fillet(fillet7_edges, radius=FILLET7_R - 0.0001)  # a hair under: the kernel refuses the full size


with BuildPart() as cut_extrude5_tool:
    # Sketch12 → Cut-Extrude5 (new body)
    with BuildSketch(Plane(origin=(28, 0, 0), x_dir=(0, 0, -1), z_dir=(1, 0, 0)).offset(CUT_EXTRUDE5_START)):
        with Locations((-10, 119)):
            Circle(SKETCH12_R)
    extrude(amount=CUT_EXTRUDE5_DEPTH)


with BuildPart() as body_7_1:
    add(body_7.part)

    # Cut-Extrude5: cut by cut_extrude5_tool
    add(cut_extrude5_tool.part, mode=Mode.SUBTRACT)


with BuildPart() as body_6_1:
    add(body_6.part)

    # Cut-Extrude5: cut by cut_extrude5_tool
    add(cut_extrude5_tool.part, mode=Mode.SUBTRACT)


with BuildPart() as body_8:
    # Sketch13 → Boss-Extrude8 (new body)
    with BuildSketch(Plane(origin=(0, 105, 0), x_dir=(1, 0, 0), z_dir=(0, 1, 0))):
        with Locations((-2.75, -10)):
            Rectangle(SKETCH13_W, SKETCH13_H)
    extrude(amount=BOSS_EXTRUDE8_DEPTH)

    # Fillet8
    fillet8_edges = [body_8.edges().sort_by_distance(p)[0] for p in [
        (-2.75, 123, 19),
        (-2.75, 123, 1),
    ]]
    fillet(fillet8_edges, radius=FILLET8_R - 0.0001)  # a hair under: the kernel refuses the full size

    # Sketch14 → Boss-Extrude9 (add)
    with BuildSketch(Plane(origin=(-1.5, 0, 0), x_dir=(0, 0, -1), z_dir=(1, 0, 0))):
        with Locations((-10, 114)):
            Circle(SKETCH14_R)
    boss_extrude9 = extrude(amount=BOSS_EXTRUDE9_DEPTH, taper=BOSS_EXTRUDE9_TAPER)

    # Mirror4: Boss-Extrude9 across plane
    add(boss_extrude9.mirror(Plane(origin=(1, 114, 10), x_dir=(0, 0, 1), z_dir=(1, 0, 0))))


with BuildPart() as body_9:
    # Sketch13 → Boss-Extrude8 2 (new body)
    with BuildSketch(Plane(origin=(0, 105, 0), x_dir=(1, 0, 0), z_dir=(0, 1, 0))):
        with Locations((4.75, -10)):
            Rectangle(SKETCH13_W, SKETCH13_H)
    extrude(amount=BOSS_EXTRUDE8_2_DEPTH)

    # Fillet9
    fillet9_edges = [body_9.edges().sort_by_distance(p)[0] for p in [
        (4.75, 123, 1),
        (4.75, 123, 19),
    ]]
    fillet(fillet9_edges, radius=FILLET9_R - 0.0001)  # a hair under: the kernel refuses the full size


with BuildPart() as cut_extrude6_tool:
    # Sketch15 → Cut-Extrude6 (new body)
    with BuildSketch(Plane(origin=(6, 0, 0), x_dir=(0, 0, -1), z_dir=(1, 0, 0)).offset(CUT_EXTRUDE6_START)):
        with Locations((-10, 114)):
            Circle(SKETCH15_R)
    extrude(amount=CUT_EXTRUDE6_DEPTH)


with BuildPart() as body_9_1:
    add(body_9.part)

    # Cut-Extrude6: cut by cut_extrude6_tool
    add(cut_extrude6_tool.part, mode=Mode.SUBTRACT)


with BuildPart() as body_8_1:
    add(body_8.part)

    # Cut-Extrude6: cut by cut_extrude6_tool
    add(cut_extrude6_tool.part, mode=Mode.SUBTRACT)


with BuildPart() as boss_extrude10_tool:
    # Sketch21 → Boss-Extrude10 (with draft: the straight prism first)
    with BuildSketch(Plane(origin=(66.5, 0, 0), x_dir=(0, 0, -1), z_dir=(1, 0, 0))):
        with Locations((-10, 117.5)):
            Circle(SKETCH21_R)
        with Locations((-10, 117.5)):
            Circle(SKETCH21_R_2, mode=Mode.SUBTRACT)
    extrude(amount=BOSS_EXTRUDE10_DEPTH)
    # Boss-Extrude10: the draft: its side faces are tilted about the plane it starts from
    boss_extrude10_sides = [boss_extrude10_tool.faces().sort_by_distance(p)[0] for p in [
        (67.75, 117.5, 12.5),
        (67.75, 117.5, 11.5),
    ]]
    draft(boss_extrude10_sides, Plane(origin=(66.5, 0, 0), x_dir=(0, 0, -1), z_dir=(1, 0, 0)), BOSS_EXTRUDE10_DRAFT)


with BuildPart() as body_2_2:
    add(body_2_1.part)

    # Boss-Extrude10: add boss_extrude10_tool
    add(boss_extrude10_tool.part)


with BuildPart() as mirror7_copy_1_tool:
    # Mirror7 copy 1 sketch → Mirror7 copy 1 (with draft: the straight prism first)
    with BuildSketch(Plane(origin=(71.5, 0, 0), x_dir=(0, 0, -1), z_dir=(-1, 0, 0))):
        with Locations((-10, -117.5)):
            Circle(MIRROR7_COPY_1_SKETCH_R)
        with Locations((-10, -117.5)):
            Circle(MIRROR7_COPY_1_SKETCH_R_2, mode=Mode.SUBTRACT)
    extrude(amount=MIRROR7_COPY_1_DEPTH)
    # Mirror7 copy 1: the draft: its side faces are tilted about the plane it starts from
    mirror7_copy_1_sides = [mirror7_copy_1_tool.faces().sort_by_distance(p)[0] for p in [
        (70.25, 117.5, 12.5),
        (70.25, 117.5, 11.5),
    ]]
    draft(mirror7_copy_1_sides, Plane(origin=(71.5, 0, 0), x_dir=(0, 0, -1), z_dir=(-1, 0, 0)), MIRROR7_COPY_1_DRAFT)


with BuildPart() as body_2_3:
    add(body_2_2.part)

    # Mirror7 copy 1: add mirror7_copy_1_tool
    add(mirror7_copy_1_tool.part)


solid = Compound([part.part, body_3_1.part, body_4_1.part, body_5_1.part, body_7_1.part, body_6_1.part, body_9_1.part, body_8_1.part, body_2_3.part])
